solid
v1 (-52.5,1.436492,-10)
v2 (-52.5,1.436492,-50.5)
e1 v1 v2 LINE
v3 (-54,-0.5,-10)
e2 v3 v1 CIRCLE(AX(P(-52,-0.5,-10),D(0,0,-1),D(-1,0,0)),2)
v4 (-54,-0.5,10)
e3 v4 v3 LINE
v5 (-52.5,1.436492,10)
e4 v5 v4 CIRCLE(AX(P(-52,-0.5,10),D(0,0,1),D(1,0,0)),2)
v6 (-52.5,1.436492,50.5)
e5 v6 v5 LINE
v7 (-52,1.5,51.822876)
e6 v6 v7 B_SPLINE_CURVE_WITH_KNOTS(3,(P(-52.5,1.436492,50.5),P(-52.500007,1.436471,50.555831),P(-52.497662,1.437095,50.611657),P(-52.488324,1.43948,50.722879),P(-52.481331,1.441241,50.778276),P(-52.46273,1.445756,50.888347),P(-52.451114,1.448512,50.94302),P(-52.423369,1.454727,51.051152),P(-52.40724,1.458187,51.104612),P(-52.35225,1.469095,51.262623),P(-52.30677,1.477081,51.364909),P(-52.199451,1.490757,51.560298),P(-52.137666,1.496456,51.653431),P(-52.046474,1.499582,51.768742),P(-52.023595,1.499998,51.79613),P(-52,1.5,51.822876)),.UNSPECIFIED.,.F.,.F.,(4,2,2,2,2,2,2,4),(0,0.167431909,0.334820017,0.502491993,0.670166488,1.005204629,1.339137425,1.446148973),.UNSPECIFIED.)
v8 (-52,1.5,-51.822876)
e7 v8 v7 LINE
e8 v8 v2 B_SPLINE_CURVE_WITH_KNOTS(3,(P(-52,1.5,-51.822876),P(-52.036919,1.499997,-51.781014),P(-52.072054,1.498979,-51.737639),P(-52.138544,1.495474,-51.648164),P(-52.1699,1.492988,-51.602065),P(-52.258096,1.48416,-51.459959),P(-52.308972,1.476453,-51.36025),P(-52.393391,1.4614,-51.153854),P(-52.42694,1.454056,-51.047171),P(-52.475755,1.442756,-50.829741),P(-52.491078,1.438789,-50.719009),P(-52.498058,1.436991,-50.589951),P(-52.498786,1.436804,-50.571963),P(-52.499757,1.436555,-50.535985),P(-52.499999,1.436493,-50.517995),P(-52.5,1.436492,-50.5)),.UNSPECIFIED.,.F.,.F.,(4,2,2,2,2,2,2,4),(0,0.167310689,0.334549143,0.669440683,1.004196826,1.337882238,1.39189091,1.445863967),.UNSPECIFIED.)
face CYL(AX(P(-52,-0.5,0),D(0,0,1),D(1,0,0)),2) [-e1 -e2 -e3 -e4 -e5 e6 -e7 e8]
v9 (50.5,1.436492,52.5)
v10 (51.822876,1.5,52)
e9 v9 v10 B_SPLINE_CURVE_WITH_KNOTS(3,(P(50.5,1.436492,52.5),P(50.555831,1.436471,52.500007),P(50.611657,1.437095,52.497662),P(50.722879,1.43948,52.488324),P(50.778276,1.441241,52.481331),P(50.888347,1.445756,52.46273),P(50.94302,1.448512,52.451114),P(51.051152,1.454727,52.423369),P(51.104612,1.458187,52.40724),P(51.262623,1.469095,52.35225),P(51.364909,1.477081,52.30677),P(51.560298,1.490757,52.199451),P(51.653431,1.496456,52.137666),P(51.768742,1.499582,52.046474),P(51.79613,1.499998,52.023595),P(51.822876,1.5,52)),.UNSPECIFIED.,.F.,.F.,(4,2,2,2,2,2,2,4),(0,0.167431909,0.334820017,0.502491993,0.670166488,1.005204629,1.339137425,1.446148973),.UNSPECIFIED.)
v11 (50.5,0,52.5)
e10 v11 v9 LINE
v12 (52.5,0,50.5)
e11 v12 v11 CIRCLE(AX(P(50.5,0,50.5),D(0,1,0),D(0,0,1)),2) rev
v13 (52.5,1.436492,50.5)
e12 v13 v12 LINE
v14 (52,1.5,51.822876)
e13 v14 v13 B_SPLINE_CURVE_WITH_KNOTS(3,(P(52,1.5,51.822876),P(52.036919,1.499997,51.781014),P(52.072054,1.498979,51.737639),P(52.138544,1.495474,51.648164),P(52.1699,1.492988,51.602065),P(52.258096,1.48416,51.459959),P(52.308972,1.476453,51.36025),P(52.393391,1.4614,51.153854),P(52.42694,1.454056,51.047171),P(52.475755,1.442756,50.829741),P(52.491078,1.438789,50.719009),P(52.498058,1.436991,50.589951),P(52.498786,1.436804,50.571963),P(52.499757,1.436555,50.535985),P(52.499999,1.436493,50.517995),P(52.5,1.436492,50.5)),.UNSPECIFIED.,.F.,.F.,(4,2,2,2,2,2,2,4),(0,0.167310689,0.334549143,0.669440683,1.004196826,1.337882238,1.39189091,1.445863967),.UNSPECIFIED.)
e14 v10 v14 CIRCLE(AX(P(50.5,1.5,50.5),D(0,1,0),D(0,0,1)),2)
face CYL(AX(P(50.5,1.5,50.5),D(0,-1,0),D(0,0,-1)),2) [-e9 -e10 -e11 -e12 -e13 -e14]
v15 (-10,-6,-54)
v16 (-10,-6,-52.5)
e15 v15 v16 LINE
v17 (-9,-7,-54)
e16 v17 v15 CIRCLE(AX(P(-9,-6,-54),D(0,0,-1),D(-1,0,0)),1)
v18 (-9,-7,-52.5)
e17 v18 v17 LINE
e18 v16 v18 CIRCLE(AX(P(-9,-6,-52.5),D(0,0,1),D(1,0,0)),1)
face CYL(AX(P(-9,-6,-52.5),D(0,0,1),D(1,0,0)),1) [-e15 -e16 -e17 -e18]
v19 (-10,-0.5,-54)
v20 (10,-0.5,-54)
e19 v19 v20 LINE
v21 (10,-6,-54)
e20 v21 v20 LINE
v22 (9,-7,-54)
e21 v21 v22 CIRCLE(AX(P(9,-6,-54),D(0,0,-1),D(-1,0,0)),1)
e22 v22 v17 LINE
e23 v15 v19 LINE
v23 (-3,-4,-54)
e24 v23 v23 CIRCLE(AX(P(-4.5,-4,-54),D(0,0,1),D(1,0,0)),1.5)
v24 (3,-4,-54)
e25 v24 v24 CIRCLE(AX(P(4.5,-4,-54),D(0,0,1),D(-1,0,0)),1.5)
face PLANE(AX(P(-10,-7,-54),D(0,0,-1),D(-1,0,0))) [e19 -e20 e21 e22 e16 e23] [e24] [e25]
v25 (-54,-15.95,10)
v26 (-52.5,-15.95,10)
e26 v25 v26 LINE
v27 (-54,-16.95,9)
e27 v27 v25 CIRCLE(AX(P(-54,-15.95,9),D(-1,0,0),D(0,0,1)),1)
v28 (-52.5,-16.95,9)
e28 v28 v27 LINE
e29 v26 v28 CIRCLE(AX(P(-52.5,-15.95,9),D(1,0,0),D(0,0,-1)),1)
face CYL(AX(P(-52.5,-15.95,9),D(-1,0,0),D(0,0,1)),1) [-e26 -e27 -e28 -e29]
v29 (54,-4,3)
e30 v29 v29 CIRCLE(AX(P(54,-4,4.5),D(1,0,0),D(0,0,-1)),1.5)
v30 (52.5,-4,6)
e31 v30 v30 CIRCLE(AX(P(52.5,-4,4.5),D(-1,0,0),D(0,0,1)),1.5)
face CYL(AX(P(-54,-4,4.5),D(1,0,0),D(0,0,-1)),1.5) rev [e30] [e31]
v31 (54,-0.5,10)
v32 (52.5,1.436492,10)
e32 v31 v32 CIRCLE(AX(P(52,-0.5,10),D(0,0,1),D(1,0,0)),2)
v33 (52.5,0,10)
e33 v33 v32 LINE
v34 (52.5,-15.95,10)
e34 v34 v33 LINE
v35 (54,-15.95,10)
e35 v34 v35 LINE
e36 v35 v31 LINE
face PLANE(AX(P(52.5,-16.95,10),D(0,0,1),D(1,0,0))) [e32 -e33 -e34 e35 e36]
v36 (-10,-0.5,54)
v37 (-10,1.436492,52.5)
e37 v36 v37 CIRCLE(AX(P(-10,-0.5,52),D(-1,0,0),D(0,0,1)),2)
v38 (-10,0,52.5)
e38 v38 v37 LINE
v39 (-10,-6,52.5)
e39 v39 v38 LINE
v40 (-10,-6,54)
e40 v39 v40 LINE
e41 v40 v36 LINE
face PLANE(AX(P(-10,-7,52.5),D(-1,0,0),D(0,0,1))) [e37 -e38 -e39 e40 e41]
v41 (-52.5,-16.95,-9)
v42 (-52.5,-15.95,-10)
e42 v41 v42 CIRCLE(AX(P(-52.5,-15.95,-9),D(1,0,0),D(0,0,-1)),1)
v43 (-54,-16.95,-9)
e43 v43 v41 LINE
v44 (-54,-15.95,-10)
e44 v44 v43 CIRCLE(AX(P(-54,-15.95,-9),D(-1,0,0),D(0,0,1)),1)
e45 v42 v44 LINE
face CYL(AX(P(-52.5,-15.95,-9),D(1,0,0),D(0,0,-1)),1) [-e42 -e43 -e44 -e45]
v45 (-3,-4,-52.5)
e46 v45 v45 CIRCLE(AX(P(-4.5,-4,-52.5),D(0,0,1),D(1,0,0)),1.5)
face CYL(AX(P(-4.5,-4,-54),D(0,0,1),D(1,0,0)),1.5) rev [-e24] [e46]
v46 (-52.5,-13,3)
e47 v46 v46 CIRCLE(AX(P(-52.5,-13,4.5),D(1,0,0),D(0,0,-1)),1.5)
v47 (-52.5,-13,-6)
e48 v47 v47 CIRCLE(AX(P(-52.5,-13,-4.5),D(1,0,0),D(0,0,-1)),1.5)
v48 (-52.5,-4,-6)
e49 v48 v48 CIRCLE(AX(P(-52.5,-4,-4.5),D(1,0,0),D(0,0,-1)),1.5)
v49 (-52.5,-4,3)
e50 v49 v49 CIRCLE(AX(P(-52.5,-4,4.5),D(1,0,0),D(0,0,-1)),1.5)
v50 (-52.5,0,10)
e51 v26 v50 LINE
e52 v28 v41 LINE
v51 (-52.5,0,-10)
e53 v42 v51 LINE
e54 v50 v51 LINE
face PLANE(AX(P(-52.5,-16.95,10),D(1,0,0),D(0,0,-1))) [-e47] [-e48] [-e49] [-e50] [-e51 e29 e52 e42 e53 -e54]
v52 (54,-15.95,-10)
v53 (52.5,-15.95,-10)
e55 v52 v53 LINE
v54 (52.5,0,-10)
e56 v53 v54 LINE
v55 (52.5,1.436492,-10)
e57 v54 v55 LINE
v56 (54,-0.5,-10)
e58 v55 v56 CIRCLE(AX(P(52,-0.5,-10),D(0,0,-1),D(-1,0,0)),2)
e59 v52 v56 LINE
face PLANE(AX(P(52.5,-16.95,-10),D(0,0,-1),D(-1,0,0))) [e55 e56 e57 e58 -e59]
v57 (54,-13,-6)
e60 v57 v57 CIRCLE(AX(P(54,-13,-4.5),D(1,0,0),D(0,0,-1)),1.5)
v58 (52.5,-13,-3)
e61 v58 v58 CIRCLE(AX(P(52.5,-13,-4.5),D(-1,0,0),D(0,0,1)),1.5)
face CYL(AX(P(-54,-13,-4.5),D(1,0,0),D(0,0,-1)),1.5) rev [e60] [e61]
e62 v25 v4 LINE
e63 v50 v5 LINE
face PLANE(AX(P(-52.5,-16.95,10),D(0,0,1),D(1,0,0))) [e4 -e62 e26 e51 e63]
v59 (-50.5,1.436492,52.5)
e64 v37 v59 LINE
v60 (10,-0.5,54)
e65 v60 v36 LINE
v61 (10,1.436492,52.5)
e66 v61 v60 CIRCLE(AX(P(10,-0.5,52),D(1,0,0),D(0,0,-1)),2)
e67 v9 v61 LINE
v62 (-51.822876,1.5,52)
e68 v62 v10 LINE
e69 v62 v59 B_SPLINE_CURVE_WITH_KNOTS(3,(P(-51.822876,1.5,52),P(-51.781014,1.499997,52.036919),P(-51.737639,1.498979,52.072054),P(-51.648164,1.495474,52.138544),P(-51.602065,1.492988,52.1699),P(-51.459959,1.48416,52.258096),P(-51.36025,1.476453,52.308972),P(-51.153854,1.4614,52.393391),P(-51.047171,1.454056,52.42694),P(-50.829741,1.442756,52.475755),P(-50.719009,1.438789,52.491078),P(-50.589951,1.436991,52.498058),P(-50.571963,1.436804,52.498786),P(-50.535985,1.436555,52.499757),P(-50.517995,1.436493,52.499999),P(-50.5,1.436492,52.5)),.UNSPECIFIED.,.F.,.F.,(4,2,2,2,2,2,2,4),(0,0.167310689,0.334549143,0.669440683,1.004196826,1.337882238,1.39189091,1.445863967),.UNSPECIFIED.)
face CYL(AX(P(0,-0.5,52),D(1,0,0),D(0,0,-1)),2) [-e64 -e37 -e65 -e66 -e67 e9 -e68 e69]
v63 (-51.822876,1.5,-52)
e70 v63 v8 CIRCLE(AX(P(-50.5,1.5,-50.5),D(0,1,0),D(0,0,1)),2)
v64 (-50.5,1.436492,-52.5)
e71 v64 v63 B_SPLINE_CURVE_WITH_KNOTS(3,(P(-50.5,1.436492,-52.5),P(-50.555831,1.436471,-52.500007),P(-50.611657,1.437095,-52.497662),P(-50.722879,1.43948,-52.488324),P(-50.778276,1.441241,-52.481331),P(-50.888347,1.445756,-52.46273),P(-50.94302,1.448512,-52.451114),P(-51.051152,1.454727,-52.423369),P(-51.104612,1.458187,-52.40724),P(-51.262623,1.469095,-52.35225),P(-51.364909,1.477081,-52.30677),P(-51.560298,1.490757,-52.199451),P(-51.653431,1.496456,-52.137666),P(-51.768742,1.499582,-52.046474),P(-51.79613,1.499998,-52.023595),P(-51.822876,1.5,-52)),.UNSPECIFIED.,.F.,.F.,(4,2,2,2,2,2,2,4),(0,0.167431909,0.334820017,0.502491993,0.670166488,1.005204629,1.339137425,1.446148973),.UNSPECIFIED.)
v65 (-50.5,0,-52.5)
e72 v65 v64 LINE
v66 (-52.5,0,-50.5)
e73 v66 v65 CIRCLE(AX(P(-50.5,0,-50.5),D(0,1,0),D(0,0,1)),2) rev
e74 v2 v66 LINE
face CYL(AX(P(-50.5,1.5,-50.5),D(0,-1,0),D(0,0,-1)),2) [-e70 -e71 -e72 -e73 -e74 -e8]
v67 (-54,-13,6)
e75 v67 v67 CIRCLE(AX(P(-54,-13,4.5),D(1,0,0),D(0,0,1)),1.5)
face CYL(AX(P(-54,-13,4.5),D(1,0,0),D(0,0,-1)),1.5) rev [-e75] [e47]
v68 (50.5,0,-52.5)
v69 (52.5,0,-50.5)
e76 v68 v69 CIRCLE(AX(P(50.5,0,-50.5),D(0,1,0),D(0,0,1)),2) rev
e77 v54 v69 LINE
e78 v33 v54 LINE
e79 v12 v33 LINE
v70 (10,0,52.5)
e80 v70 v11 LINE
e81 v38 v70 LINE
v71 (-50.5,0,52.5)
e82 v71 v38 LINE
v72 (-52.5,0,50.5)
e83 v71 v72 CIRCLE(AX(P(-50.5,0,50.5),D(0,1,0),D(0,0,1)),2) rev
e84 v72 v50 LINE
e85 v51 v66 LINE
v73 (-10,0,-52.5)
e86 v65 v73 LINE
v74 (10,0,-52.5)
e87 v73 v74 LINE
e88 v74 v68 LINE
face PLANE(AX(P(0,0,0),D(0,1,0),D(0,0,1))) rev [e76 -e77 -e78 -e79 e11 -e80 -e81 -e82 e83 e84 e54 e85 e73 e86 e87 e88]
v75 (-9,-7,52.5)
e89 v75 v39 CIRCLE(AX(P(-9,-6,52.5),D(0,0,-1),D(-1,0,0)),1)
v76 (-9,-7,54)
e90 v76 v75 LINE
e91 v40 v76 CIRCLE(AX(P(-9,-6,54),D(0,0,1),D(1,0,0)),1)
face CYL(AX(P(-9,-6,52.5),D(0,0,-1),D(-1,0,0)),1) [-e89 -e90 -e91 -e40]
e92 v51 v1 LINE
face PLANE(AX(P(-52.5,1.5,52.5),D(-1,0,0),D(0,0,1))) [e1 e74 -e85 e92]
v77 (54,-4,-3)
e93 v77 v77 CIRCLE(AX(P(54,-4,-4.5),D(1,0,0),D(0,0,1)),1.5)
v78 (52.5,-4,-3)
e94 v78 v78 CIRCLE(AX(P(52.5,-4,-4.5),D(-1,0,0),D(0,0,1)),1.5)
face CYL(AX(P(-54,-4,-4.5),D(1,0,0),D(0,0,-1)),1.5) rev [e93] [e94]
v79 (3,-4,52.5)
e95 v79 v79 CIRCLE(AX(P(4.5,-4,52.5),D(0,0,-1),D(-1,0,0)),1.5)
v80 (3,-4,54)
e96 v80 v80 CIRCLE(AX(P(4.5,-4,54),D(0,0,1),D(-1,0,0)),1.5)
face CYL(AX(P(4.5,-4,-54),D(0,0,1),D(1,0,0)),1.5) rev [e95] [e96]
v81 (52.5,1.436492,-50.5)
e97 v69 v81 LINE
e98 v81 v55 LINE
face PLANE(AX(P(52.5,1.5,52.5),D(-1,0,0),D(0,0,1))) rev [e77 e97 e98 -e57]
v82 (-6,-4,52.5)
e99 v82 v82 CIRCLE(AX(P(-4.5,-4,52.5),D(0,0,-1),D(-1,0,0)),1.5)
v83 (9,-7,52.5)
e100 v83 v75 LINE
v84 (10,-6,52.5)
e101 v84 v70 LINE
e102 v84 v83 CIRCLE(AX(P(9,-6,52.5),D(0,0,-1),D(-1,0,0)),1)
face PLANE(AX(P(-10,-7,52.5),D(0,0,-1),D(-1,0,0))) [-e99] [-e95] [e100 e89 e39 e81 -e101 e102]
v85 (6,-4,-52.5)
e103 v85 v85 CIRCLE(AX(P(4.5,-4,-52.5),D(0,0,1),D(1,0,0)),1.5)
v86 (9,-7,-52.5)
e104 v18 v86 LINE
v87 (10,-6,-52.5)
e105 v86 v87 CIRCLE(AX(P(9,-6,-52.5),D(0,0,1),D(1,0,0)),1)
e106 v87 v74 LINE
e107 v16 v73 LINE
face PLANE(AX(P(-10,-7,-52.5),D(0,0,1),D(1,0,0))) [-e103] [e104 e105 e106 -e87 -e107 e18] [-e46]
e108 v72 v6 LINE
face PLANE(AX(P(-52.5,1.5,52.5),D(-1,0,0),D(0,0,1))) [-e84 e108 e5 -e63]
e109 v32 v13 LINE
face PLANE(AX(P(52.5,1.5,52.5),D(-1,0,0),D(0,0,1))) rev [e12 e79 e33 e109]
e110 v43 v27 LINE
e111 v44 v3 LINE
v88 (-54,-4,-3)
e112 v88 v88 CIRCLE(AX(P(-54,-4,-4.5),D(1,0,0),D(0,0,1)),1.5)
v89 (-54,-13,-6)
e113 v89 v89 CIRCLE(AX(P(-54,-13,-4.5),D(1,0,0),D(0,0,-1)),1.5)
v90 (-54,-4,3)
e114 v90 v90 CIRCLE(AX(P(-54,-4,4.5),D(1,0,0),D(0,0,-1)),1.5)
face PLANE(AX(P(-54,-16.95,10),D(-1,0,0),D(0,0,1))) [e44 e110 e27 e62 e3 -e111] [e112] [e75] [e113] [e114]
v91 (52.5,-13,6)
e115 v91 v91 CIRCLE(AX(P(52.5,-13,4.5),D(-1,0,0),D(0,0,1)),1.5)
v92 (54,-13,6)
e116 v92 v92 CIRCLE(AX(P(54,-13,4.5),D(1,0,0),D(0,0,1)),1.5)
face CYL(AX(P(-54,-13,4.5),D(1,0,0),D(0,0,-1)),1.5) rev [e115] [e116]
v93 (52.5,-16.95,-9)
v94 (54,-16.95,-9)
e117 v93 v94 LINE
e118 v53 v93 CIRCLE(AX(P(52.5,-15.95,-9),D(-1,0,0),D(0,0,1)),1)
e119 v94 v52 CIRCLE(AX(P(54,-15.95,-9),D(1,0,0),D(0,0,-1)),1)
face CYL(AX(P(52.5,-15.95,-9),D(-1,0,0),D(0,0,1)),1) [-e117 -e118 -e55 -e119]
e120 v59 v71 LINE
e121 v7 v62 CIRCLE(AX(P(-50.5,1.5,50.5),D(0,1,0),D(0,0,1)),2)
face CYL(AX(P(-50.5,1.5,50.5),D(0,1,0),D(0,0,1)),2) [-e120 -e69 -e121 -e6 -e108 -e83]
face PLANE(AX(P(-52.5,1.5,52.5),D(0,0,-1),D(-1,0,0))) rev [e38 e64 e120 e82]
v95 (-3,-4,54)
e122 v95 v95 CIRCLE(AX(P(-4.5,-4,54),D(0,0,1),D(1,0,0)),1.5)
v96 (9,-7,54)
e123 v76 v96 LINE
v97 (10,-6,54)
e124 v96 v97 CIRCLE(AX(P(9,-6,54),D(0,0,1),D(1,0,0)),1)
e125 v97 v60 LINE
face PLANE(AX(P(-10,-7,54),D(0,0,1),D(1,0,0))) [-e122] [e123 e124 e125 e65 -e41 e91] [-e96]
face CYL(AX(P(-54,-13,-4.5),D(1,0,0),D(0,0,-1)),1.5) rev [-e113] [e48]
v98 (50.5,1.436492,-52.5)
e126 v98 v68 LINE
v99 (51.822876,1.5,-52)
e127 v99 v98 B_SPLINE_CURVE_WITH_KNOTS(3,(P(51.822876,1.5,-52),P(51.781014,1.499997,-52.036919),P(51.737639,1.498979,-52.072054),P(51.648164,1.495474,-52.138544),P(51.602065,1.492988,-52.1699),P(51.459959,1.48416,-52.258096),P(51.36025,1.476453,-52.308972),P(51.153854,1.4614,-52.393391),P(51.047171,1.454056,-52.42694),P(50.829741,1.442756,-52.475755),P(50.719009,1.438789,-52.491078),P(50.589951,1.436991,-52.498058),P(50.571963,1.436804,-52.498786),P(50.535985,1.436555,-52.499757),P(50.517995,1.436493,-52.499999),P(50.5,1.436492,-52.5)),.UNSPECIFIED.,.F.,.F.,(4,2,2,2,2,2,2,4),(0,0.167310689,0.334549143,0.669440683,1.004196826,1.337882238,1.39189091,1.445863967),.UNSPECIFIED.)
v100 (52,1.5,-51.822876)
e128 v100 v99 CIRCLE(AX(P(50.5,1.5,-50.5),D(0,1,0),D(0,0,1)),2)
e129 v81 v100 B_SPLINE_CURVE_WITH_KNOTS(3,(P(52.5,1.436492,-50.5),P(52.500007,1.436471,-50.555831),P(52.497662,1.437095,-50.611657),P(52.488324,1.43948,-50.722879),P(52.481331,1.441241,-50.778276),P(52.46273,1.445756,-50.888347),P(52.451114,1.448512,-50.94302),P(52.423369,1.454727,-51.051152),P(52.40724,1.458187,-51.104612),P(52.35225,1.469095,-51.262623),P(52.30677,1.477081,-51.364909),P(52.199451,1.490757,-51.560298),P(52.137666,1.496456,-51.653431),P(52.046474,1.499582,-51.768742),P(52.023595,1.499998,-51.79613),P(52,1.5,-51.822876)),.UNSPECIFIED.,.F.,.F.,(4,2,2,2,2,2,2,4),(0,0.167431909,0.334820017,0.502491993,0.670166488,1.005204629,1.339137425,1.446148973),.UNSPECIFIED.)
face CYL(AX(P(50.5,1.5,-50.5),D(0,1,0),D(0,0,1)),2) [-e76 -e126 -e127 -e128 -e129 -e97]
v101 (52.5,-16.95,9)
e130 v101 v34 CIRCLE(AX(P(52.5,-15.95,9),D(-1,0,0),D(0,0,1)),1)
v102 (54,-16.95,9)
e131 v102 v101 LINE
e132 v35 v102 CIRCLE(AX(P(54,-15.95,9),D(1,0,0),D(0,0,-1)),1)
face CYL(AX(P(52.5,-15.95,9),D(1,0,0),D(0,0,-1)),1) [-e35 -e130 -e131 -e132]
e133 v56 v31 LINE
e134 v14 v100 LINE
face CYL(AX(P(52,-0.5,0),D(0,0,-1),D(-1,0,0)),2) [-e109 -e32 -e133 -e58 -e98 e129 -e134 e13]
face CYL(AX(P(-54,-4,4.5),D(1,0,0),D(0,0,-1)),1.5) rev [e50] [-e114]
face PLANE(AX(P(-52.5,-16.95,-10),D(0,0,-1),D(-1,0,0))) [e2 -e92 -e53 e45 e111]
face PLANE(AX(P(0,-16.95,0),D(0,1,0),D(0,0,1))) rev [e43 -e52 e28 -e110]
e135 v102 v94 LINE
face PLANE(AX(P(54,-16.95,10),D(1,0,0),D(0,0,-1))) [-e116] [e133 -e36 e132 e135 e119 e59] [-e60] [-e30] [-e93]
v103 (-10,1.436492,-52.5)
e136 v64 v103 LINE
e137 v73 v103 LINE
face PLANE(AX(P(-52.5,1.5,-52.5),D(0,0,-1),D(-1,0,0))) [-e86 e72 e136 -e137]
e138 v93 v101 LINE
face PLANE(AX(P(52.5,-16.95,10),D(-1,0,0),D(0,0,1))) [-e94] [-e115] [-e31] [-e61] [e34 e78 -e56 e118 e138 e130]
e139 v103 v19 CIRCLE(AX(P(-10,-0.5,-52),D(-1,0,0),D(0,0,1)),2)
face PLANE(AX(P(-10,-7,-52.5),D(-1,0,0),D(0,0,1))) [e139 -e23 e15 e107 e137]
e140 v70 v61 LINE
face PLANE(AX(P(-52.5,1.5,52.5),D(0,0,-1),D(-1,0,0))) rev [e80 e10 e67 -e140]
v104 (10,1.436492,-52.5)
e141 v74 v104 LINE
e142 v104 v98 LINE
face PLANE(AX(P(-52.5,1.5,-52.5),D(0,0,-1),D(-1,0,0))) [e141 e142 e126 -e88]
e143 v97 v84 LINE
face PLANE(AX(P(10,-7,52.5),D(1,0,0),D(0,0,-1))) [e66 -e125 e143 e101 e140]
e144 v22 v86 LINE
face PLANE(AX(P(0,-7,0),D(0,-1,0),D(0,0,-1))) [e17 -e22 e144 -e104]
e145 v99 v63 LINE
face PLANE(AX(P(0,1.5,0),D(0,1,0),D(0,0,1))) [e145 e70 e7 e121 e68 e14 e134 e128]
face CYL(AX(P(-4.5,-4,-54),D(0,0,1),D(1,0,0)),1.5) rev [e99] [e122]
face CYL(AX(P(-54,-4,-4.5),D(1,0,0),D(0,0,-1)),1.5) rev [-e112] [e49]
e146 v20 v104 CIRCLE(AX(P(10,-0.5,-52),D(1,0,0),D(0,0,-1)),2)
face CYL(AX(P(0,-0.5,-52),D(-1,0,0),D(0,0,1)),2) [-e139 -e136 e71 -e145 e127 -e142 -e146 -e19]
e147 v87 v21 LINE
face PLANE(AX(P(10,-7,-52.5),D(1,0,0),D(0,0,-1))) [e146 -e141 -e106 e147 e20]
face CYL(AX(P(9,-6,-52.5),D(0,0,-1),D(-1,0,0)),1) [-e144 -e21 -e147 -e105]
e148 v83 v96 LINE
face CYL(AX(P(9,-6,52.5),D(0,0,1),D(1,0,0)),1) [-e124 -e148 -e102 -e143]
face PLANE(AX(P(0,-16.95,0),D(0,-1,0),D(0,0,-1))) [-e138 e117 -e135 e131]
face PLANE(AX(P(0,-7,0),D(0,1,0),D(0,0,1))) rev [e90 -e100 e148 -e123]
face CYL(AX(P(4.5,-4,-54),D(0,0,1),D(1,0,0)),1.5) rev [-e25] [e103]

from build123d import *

# Parameters (mm, degrees)
SKETCH1_W           = 105
SKETCH1_H           = 105
BOSS_EXTRUDE1_DEPTH = 1.5
SKETCH2_W           = 20
SKETCH2_H           = 1.5
BOSS_EXTRUDE2_DEPTH = 8.5
SKETCH3_W           = 1.5
SKETCH3_H           = 20
BOSS_EXTRUDE3_DEPTH = 18.45
SKETCH4_R           = 1.5
CUT_EXTRUDE1_DEPTH  = 122.93154842
SKETCH5_R           = 1.5
CUT_EXTRUDE2_DEPTH  = 122.93154842
FILLET1_R           = 1
FILLET2_START       = -53.84589
FILLET2_DEPTH       = 107.69178
FILLET2_START_2     = -53
FILLET2_2_DEPTH     = 106
FILLET3_R           = 2


with BuildPart() as part:
    # Sketch1 → Boss-Extrude1 (new body)
    with BuildSketch(Plane(origin=(0, 0, 0), x_dir=(1, 0, 0), z_dir=(0, 1, 0))):
        Rectangle(SKETCH1_W, SKETCH1_H)
    extrude(amount=BOSS_EXTRUDE1_DEPTH)

    # Sketch2 → Boss-Extrude2 (add)
    with BuildSketch(Plane(origin=(0, 1.5, 0), x_dir=(1, 0, 0), z_dir=(0, 1, 0))):
        with Locations((0, 53.25)):
            Rectangle(SKETCH2_W, SKETCH2_H)
        with Locations((0, -53.25)):
            Rectangle(SKETCH2_W, SKETCH2_H)
    extrude(amount=-BOSS_EXTRUDE2_DEPTH)

    # Sketch3 → Boss-Extrude3 (add)
    with BuildSketch(Plane(origin=(0, 1.5, 0), x_dir=(1, 0, 0), z_dir=(0, 1, 0))):
        with Locations((53.25, 0)):
            Rectangle(SKETCH3_W, SKETCH3_H)
        with Locations((-53.25, 0)):
            Rectangle(SKETCH3_W, SKETCH3_H)
    extrude(amount=-BOSS_EXTRUDE3_DEPTH)

    # Sketch4 → Cut-Extrude1 (cut, through all)
    with BuildSketch(Plane.XY.offset(54)):
        with Locations((-4.5, -4)):
            Circle(SKETCH4_R)
        with Locations(Location((4.5, -4, 0), (0, 0, 180))):
            Circle(SKETCH4_R)
    extrude(amount=-CUT_EXTRUDE1_DEPTH, mode=Mode.SUBTRACT)

    # Sketch5 → Cut-Extrude2 (cut, through all)
    with BuildSketch(Plane(origin=(54, 0, 0), x_dir=(0, 0, -1), z_dir=(1, 0, 0))):
        with Locations((-4.5, -4)):
            Circle(SKETCH5_R)
        with Locations((4.5, -4)):
            Circle(SKETCH5_R)
        with Locations((4.5, -13)):
            Circle(SKETCH5_R)
        with Locations((-4.5, -13)):
            Circle(SKETCH5_R)
    extrude(amount=-CUT_EXTRUDE2_DEPTH, mode=Mode.SUBTRACT)

    # Fillet1
    fillet1_edges = [part.edges().sort_by_distance(p)[0] for p in [
        (-10, -7, -53.25),
        (10, -7, -53.25),
        (-10, -7, 53.25),
        (10, -7, 53.25),
        (53.25, -16.95, -10),
        (53.25, -16.95, 10),
        (-53.25, -16.95, 10),
        (-53.25, -16.95, -10),
    ]]
    fillet(fillet1_edges, radius=FILLET1_R)

    # Fillet2: read off the stored shape, not the designer's step
    # Fillet2 outline → Fillet2 (cut)
    with BuildSketch(Plane.XY.offset(FILLET2_START)):
        with BuildLine():
            ThreePointArc((52, 1.5), (53.414213562, 0.914213562), (54, -0.5))
            Line((54, -0.5), (54, 1.5))
            Line((54, 1.5), (52, 1.5))
        make_face()
        with BuildLine():
            Line((-52, 1.5), (-54, 1.5))
            Line((-54, 1.5), (-54, -0.5))
            ThreePointArc((-54, -0.5), (-53.414213562, 0.914213562), (-52, 1.5))
        make_face()
    extrude(amount=FILLET2_DEPTH, mode=Mode.SUBTRACT)

    # Fillet2 2 outline → Fillet2 2 (cut)
    with BuildSketch(Plane.YZ.offset(FILLET2_START_2)):
        with BuildLine():
            ThreePointArc((1.5, -52), (0.914213562, -53.414213562), (-0.5, -54))
            Line((-0.5, -54), (1.5, -54))
            Line((1.5, -54), (1.5, -52))
        make_face()
        with BuildLine():
            Line((1.5, 52), (1.5, 54))
            Line((1.5, 54), (-0.5, 54))
            ThreePointArc((-0.5, 54), (0.914213562, 53.414213562), (1.5, 52))
        make_face()
    extrude(amount=FILLET2_2_DEPTH, mode=Mode.SUBTRACT)

    # Fillet3
    # the kernel refuses this fillet: 2 mm, written as the material it takes off along each edge
    with BuildSketch(Plane(origin=(52.5, -5, -52.5), x_dir=(0, 0, 1), z_dir=(0, 1, 0)), Plane(origin=(52.5, -5, 52.5), x_dir=(-1, 0, 0), z_dir=(0, 1, 0)), Plane(origin=(-52.5, -5, -52.5), x_dir=(1, 0, 0), z_dir=(0, 1, 0))) as fillet3_piece_1:
        with BuildLine():
            CenterArc((FILLET3_R, -FILLET3_R), FILLET3_R, 90, 90)
            Line((0, -FILLET3_R), (0, 0))
            Line((0, 0), (FILLET3_R, 0))
        make_face()
    extrude(amount=11.436491673, mode=Mode.SUBTRACT)
    with BuildSketch(Plane(origin=(-52.5, -5, 52.5), x_dir=(1, 0, 0), z_dir=(0, 1, 0))) as fillet3_piece_2:
        with BuildLine():
            CenterArc((FILLET3_R, FILLET3_R), FILLET3_R, 180, 90)
            Line((0, FILLET3_R), (0, 0))
            Line((0, 0), (FILLET3_R, 0))
        make_face()
    extrude(amount=11.436491673, mode=Mode.SUBTRACT)


solid = part.part
